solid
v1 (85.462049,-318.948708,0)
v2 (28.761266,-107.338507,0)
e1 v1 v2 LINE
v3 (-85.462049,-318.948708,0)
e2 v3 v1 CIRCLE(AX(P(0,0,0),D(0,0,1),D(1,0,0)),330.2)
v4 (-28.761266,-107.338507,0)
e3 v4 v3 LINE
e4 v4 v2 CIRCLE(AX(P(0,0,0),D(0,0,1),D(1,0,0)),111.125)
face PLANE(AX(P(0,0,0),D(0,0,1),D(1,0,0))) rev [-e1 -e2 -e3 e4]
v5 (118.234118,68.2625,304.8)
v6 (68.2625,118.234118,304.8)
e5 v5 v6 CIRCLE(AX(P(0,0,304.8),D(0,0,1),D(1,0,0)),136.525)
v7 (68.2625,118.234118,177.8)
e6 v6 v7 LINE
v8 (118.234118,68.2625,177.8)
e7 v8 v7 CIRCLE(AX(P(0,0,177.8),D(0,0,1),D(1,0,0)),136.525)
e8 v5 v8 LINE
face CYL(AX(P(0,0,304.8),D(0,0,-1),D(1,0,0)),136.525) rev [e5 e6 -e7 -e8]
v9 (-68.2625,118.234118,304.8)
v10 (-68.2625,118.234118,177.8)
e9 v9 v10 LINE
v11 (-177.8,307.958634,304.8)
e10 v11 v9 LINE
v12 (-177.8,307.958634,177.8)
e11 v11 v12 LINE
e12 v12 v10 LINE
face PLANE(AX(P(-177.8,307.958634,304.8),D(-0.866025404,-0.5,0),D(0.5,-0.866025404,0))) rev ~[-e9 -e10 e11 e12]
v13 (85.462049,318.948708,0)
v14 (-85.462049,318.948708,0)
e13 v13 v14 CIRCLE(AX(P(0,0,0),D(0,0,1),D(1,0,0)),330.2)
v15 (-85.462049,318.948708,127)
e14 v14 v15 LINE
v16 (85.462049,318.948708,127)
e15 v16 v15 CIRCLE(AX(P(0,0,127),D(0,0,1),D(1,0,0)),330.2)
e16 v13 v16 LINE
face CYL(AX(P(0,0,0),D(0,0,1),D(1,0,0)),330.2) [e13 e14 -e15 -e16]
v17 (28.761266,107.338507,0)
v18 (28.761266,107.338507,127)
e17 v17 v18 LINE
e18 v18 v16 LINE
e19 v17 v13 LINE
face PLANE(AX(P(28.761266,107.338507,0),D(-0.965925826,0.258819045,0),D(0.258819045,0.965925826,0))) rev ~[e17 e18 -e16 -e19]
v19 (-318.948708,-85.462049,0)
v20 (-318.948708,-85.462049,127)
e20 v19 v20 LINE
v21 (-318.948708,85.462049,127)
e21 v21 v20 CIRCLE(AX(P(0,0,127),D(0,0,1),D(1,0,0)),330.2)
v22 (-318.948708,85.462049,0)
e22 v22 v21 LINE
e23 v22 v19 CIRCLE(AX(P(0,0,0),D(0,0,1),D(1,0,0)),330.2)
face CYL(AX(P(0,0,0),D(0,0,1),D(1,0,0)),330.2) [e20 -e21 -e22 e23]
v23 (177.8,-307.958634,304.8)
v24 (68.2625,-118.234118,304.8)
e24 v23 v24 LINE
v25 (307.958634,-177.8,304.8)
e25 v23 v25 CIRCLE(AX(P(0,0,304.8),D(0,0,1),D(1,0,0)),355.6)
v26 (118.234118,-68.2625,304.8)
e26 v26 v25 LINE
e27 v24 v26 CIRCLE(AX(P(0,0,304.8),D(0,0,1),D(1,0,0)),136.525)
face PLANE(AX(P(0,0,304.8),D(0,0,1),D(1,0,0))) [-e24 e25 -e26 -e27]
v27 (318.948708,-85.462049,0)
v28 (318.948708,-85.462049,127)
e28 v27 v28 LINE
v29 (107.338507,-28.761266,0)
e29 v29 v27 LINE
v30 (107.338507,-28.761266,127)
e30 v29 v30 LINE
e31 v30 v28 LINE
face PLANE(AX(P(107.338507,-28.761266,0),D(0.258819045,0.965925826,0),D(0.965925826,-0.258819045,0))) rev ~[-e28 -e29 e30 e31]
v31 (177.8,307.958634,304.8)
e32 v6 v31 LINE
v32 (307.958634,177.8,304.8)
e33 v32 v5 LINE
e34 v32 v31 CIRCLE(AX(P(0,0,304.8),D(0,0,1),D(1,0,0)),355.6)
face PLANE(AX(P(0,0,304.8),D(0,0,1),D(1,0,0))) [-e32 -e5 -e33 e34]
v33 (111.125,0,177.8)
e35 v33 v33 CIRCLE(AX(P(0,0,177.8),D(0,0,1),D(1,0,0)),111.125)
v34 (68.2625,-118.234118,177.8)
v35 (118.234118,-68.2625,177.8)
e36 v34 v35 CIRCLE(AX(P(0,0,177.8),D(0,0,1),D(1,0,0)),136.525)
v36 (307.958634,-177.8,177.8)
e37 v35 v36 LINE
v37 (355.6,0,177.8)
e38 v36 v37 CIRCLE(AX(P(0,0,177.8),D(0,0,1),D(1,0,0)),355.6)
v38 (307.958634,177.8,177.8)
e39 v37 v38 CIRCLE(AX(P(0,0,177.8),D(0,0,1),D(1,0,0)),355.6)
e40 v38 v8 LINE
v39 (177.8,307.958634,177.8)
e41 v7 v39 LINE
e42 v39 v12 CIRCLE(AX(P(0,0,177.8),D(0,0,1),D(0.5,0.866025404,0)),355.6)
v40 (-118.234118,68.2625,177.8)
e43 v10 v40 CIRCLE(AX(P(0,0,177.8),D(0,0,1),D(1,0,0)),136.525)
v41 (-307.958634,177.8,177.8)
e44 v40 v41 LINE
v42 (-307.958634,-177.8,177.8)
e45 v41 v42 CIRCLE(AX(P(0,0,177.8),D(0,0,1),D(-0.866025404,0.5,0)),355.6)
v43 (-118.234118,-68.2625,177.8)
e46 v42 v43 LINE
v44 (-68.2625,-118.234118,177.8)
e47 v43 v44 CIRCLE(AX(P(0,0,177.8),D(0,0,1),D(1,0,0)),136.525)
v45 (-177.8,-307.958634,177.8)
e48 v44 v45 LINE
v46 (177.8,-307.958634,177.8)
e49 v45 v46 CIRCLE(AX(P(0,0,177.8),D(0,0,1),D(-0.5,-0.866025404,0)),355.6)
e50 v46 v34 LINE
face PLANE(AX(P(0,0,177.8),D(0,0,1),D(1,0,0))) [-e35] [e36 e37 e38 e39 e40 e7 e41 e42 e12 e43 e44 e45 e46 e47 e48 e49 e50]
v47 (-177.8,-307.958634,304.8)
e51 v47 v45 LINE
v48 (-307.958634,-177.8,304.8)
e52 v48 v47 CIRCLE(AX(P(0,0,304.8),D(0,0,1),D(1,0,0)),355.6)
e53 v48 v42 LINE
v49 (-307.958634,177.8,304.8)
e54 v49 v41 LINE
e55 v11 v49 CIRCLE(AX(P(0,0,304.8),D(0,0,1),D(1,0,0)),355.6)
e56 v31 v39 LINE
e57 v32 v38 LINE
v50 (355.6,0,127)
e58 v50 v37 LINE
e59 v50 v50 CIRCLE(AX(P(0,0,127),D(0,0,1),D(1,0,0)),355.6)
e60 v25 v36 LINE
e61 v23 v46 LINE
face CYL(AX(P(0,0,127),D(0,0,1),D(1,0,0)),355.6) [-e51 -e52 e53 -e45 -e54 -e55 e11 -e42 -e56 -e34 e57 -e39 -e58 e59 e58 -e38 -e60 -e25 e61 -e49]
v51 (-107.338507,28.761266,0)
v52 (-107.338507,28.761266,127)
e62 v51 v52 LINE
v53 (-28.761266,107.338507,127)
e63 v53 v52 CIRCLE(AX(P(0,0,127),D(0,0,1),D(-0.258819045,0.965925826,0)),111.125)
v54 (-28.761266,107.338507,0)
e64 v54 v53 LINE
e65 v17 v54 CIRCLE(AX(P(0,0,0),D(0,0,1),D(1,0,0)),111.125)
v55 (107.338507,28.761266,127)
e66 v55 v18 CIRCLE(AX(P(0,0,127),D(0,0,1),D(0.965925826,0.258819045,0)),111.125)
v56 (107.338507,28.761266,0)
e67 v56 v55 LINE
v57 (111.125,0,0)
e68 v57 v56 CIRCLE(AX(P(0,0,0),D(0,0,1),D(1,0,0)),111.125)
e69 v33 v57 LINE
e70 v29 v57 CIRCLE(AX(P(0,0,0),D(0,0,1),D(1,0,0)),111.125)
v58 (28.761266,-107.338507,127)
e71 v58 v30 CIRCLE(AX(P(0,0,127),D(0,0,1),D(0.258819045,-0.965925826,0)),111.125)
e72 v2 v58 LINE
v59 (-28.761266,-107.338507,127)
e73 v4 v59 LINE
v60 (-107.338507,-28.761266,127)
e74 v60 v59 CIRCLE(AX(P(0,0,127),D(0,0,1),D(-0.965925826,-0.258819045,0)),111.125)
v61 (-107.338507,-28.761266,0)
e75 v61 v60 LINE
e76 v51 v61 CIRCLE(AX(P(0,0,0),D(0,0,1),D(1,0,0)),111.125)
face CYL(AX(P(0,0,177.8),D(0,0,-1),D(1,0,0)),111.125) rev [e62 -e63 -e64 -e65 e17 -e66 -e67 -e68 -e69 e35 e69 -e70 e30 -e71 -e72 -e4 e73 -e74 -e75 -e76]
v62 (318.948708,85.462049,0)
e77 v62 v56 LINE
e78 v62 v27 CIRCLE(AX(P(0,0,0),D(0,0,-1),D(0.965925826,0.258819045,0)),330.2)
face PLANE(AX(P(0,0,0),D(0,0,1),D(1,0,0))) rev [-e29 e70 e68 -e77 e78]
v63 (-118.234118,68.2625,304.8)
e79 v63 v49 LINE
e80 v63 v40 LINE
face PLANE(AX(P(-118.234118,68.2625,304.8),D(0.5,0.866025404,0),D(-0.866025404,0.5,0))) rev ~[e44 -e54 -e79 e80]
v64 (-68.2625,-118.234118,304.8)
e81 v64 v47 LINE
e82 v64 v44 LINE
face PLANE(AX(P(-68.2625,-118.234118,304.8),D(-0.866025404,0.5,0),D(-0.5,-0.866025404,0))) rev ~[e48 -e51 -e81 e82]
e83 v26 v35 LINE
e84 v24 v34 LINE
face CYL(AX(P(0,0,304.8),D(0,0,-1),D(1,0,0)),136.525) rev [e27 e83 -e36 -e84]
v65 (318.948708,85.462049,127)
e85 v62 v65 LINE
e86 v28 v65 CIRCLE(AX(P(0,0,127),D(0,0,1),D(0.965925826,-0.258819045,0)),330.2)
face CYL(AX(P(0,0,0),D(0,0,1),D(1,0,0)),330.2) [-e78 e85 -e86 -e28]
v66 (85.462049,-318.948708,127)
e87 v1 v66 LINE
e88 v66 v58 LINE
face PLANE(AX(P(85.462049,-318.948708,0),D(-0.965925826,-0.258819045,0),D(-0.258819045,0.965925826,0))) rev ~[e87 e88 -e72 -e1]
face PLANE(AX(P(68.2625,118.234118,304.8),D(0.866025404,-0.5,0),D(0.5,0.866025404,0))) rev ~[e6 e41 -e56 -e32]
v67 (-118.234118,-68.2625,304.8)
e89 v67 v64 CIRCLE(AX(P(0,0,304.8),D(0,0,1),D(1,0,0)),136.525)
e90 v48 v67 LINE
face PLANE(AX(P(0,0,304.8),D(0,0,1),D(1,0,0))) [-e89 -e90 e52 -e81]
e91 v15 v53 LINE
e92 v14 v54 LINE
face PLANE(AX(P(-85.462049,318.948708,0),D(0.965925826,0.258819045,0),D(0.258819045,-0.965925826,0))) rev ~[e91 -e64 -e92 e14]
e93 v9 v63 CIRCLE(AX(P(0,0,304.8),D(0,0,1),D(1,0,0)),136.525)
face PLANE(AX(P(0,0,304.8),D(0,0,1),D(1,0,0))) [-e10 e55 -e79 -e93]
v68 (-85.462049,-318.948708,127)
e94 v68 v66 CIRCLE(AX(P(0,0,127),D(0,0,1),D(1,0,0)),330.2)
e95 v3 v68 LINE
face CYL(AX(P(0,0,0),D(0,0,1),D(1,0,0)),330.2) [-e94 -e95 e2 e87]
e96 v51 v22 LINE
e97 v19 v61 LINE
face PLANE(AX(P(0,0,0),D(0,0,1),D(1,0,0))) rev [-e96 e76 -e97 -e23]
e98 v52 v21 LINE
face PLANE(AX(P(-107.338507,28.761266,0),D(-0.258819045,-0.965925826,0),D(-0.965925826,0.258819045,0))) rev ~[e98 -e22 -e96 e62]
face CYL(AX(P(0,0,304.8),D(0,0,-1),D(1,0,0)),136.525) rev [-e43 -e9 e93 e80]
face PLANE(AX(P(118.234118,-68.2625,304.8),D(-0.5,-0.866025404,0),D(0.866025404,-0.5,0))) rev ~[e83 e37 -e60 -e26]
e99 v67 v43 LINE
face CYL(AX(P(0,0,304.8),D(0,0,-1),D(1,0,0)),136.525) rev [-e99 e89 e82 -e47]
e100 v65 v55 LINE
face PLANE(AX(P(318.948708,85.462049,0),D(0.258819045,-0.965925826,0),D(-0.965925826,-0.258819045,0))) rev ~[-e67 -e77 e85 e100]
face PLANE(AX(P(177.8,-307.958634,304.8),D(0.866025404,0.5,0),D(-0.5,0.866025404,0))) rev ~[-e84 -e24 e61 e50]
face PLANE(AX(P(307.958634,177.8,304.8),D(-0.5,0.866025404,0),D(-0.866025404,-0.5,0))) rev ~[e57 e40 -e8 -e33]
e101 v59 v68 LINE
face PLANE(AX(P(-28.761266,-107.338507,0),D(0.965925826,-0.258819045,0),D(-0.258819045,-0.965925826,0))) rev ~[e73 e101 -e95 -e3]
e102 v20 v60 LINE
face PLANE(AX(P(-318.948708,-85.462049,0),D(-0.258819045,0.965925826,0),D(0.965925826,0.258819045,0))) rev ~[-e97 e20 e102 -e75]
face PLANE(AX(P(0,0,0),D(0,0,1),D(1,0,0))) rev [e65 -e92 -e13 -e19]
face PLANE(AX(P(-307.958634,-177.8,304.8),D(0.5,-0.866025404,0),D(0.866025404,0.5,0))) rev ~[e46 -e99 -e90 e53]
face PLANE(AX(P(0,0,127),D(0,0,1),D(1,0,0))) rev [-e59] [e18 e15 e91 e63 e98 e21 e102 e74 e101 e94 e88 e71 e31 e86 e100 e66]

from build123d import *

# Parameters (mm, degrees)
F3_DEPTH = 127
F5_DEPTH = 127


with BuildPart() as f1:
    # F0 (on Front) → F1 (revolve)
    with BuildSketch(Plane.XZ):
        Polygon((136.525, 177.8), (111.125, 177.8), (111.125, 0), (330.2, 0), (330.2, 127), (355.6, 127), (355.6, 304.8), (136.525, 304.8), align=None)
    revolve(axis=Axis((0, 0, 359.9156904304), (0, 0, 1)))

    # F2 (on face) → F3 (cut)
    with BuildSketch(Plane.XY.offset(304.8)):
        with BuildLine():
            ThreePointArc((-307.9586335857, 177.8), (-355.6, 0), (-307.9586335857, -177.8))
            Line((-307.9586335857, -177.8), (-118.2341182517, -68.2625))
            ThreePointArc((-118.2341182517, -68.2625), (-136.525, 0), (-118.2341182517, 68.2625))
            Line((-118.2341182517, 68.2625), (-307.9586335857, 177.8))
        make_face()
        with BuildLine():
            Line((-68.2625, -118.2341182517), (-177.8, -307.9586335857))
            ThreePointArc((-177.8, -307.9586335857), (0, -355.6), (177.8, -307.9586335857))
            Line((177.8, -307.9586335857), (68.2625, -118.2341182517))
            ThreePointArc((68.2625, -118.2341182517), (0, -136.525), (-68.2625, -118.2341182517))
        make_face()
        with BuildLine():
            ThreePointArc((177.8, 307.9586335857), (0, 355.6), (-177.8, 307.9586335857))
            Line((-177.8, 307.9586335857), (-68.2625, 118.2341182517))
            ThreePointArc((-68.2625, 118.2341182517), (0, 136.525), (68.2625, 118.2341182517))
            Line((68.2625, 118.2341182517), (177.8, 307.9586335857))
        make_face()
        with BuildLine():
            Line((307.9586335857, 177.8), (118.2341182517, 68.2625))
            ThreePointArc((118.2341182517, 68.2625), (131.8730234341, 35.3352701326), (136.525, 0))
            ThreePointArc((136.525, 0), (131.8730234341, -35.3352701326), (118.2341182517, -68.2625))
            Line((118.2341182517, -68.2625), (307.9586335857, -177.8))
            ThreePointArc((307.9586335857, -177.8), (343.4832238284, -92.0360524385), (355.6, 0))
            ThreePointArc((355.6, 0), (343.4832238284, 92.0360524385), (307.9586335857, 177.8))
        make_face()
        with BuildLine():
            ThreePointArc((355.6, 0), (343.4832238284, -92.0360524385), (307.9586335857, -177.8))
            Line((307.9586335857, -177.8), (329.9556788419, -190.5))
            ThreePointArc((329.9556788419, -190.5), (381, 0), (329.9556788419, 190.5))
            Line((329.9556788419, 190.5), (307.9586335857, 177.8))
            ThreePointArc((307.9586335857, 177.8), (343.4832238284, 92.0360524385), (355.6, 0))
        make_face()
    extrude(amount=-F3_DEPTH, mode=Mode.SUBTRACT)

    # F4 (on face) → F5 (cut)
    with BuildSketch(Plane(origin=(0, 0, 0), x_dir=(1, 0, 0), z_dir=(0, 0, -1))):
        with BuildLine():
            Line((-28.761266387, 107.3385074464), (-85.4620486929, 318.9487078407))
            ThreePointArc((-85.4620486928, 318.9487078407), (-233.4866591478, 233.4866591478), (-318.9487078407, 85.4620486929))
            Line((-318.9487078407, 85.4620486929), (-107.3385074464, 28.761266387))
            ThreePointArc((-107.3385074464, 28.761266387), (-78.5772410594, 78.5772410594), (-28.761266387, 107.3385074464))
        make_face()
        with BuildLine():
            Line((107.3385074464, 28.761266387), (318.9487078407, 85.4620486929))
            ThreePointArc((318.9487078406, 85.4620486929), (233.4866591478, 233.4866591478), (85.4620486928, 318.9487078407))
            Line((85.4620486929, 318.9487078407), (28.761266387, 107.3385074464))
            ThreePointArc((28.761266387, 107.3385074464), (78.5772410594, 78.5772410594), (107.3385074464, 28.761266387))
        make_face()
        with BuildLine():
            ThreePointArc((85.4620486928, -318.9487078407), (233.4866591478, -233.4866591478), (318.9487078406, -85.4620486929))
            Line((318.9487078407, -85.4620486929), (107.3385074464, -28.761266387))
            ThreePointArc((107.3385074464, -28.761266387), (78.5772410594, -78.5772410594), (28.761266387, -107.3385074464))
            Line((28.761266387, -107.3385074464), (85.4620486929, -318.9487078407))
        make_face()
        with BuildLine():
            ThreePointArc((-318.9487078407, -85.4620486929), (-233.4866591478, -233.4866591478), (-85.4620486928, -318.9487078407))
            Line((-85.4620486929, -318.9487078407), (-28.761266387, -107.3385074464))
            ThreePointArc((-28.761266387, -107.3385074464), (-78.5772410594, -78.5772410594), (-107.3385074464, -28.761266387))
            Line((-107.3385074464, -28.761266387), (-318.9487078407, -85.4620486929))
        make_face()
    extrude(amount=-F5_DEPTH, mode=Mode.SUBTRACT)


solid = f1.part
